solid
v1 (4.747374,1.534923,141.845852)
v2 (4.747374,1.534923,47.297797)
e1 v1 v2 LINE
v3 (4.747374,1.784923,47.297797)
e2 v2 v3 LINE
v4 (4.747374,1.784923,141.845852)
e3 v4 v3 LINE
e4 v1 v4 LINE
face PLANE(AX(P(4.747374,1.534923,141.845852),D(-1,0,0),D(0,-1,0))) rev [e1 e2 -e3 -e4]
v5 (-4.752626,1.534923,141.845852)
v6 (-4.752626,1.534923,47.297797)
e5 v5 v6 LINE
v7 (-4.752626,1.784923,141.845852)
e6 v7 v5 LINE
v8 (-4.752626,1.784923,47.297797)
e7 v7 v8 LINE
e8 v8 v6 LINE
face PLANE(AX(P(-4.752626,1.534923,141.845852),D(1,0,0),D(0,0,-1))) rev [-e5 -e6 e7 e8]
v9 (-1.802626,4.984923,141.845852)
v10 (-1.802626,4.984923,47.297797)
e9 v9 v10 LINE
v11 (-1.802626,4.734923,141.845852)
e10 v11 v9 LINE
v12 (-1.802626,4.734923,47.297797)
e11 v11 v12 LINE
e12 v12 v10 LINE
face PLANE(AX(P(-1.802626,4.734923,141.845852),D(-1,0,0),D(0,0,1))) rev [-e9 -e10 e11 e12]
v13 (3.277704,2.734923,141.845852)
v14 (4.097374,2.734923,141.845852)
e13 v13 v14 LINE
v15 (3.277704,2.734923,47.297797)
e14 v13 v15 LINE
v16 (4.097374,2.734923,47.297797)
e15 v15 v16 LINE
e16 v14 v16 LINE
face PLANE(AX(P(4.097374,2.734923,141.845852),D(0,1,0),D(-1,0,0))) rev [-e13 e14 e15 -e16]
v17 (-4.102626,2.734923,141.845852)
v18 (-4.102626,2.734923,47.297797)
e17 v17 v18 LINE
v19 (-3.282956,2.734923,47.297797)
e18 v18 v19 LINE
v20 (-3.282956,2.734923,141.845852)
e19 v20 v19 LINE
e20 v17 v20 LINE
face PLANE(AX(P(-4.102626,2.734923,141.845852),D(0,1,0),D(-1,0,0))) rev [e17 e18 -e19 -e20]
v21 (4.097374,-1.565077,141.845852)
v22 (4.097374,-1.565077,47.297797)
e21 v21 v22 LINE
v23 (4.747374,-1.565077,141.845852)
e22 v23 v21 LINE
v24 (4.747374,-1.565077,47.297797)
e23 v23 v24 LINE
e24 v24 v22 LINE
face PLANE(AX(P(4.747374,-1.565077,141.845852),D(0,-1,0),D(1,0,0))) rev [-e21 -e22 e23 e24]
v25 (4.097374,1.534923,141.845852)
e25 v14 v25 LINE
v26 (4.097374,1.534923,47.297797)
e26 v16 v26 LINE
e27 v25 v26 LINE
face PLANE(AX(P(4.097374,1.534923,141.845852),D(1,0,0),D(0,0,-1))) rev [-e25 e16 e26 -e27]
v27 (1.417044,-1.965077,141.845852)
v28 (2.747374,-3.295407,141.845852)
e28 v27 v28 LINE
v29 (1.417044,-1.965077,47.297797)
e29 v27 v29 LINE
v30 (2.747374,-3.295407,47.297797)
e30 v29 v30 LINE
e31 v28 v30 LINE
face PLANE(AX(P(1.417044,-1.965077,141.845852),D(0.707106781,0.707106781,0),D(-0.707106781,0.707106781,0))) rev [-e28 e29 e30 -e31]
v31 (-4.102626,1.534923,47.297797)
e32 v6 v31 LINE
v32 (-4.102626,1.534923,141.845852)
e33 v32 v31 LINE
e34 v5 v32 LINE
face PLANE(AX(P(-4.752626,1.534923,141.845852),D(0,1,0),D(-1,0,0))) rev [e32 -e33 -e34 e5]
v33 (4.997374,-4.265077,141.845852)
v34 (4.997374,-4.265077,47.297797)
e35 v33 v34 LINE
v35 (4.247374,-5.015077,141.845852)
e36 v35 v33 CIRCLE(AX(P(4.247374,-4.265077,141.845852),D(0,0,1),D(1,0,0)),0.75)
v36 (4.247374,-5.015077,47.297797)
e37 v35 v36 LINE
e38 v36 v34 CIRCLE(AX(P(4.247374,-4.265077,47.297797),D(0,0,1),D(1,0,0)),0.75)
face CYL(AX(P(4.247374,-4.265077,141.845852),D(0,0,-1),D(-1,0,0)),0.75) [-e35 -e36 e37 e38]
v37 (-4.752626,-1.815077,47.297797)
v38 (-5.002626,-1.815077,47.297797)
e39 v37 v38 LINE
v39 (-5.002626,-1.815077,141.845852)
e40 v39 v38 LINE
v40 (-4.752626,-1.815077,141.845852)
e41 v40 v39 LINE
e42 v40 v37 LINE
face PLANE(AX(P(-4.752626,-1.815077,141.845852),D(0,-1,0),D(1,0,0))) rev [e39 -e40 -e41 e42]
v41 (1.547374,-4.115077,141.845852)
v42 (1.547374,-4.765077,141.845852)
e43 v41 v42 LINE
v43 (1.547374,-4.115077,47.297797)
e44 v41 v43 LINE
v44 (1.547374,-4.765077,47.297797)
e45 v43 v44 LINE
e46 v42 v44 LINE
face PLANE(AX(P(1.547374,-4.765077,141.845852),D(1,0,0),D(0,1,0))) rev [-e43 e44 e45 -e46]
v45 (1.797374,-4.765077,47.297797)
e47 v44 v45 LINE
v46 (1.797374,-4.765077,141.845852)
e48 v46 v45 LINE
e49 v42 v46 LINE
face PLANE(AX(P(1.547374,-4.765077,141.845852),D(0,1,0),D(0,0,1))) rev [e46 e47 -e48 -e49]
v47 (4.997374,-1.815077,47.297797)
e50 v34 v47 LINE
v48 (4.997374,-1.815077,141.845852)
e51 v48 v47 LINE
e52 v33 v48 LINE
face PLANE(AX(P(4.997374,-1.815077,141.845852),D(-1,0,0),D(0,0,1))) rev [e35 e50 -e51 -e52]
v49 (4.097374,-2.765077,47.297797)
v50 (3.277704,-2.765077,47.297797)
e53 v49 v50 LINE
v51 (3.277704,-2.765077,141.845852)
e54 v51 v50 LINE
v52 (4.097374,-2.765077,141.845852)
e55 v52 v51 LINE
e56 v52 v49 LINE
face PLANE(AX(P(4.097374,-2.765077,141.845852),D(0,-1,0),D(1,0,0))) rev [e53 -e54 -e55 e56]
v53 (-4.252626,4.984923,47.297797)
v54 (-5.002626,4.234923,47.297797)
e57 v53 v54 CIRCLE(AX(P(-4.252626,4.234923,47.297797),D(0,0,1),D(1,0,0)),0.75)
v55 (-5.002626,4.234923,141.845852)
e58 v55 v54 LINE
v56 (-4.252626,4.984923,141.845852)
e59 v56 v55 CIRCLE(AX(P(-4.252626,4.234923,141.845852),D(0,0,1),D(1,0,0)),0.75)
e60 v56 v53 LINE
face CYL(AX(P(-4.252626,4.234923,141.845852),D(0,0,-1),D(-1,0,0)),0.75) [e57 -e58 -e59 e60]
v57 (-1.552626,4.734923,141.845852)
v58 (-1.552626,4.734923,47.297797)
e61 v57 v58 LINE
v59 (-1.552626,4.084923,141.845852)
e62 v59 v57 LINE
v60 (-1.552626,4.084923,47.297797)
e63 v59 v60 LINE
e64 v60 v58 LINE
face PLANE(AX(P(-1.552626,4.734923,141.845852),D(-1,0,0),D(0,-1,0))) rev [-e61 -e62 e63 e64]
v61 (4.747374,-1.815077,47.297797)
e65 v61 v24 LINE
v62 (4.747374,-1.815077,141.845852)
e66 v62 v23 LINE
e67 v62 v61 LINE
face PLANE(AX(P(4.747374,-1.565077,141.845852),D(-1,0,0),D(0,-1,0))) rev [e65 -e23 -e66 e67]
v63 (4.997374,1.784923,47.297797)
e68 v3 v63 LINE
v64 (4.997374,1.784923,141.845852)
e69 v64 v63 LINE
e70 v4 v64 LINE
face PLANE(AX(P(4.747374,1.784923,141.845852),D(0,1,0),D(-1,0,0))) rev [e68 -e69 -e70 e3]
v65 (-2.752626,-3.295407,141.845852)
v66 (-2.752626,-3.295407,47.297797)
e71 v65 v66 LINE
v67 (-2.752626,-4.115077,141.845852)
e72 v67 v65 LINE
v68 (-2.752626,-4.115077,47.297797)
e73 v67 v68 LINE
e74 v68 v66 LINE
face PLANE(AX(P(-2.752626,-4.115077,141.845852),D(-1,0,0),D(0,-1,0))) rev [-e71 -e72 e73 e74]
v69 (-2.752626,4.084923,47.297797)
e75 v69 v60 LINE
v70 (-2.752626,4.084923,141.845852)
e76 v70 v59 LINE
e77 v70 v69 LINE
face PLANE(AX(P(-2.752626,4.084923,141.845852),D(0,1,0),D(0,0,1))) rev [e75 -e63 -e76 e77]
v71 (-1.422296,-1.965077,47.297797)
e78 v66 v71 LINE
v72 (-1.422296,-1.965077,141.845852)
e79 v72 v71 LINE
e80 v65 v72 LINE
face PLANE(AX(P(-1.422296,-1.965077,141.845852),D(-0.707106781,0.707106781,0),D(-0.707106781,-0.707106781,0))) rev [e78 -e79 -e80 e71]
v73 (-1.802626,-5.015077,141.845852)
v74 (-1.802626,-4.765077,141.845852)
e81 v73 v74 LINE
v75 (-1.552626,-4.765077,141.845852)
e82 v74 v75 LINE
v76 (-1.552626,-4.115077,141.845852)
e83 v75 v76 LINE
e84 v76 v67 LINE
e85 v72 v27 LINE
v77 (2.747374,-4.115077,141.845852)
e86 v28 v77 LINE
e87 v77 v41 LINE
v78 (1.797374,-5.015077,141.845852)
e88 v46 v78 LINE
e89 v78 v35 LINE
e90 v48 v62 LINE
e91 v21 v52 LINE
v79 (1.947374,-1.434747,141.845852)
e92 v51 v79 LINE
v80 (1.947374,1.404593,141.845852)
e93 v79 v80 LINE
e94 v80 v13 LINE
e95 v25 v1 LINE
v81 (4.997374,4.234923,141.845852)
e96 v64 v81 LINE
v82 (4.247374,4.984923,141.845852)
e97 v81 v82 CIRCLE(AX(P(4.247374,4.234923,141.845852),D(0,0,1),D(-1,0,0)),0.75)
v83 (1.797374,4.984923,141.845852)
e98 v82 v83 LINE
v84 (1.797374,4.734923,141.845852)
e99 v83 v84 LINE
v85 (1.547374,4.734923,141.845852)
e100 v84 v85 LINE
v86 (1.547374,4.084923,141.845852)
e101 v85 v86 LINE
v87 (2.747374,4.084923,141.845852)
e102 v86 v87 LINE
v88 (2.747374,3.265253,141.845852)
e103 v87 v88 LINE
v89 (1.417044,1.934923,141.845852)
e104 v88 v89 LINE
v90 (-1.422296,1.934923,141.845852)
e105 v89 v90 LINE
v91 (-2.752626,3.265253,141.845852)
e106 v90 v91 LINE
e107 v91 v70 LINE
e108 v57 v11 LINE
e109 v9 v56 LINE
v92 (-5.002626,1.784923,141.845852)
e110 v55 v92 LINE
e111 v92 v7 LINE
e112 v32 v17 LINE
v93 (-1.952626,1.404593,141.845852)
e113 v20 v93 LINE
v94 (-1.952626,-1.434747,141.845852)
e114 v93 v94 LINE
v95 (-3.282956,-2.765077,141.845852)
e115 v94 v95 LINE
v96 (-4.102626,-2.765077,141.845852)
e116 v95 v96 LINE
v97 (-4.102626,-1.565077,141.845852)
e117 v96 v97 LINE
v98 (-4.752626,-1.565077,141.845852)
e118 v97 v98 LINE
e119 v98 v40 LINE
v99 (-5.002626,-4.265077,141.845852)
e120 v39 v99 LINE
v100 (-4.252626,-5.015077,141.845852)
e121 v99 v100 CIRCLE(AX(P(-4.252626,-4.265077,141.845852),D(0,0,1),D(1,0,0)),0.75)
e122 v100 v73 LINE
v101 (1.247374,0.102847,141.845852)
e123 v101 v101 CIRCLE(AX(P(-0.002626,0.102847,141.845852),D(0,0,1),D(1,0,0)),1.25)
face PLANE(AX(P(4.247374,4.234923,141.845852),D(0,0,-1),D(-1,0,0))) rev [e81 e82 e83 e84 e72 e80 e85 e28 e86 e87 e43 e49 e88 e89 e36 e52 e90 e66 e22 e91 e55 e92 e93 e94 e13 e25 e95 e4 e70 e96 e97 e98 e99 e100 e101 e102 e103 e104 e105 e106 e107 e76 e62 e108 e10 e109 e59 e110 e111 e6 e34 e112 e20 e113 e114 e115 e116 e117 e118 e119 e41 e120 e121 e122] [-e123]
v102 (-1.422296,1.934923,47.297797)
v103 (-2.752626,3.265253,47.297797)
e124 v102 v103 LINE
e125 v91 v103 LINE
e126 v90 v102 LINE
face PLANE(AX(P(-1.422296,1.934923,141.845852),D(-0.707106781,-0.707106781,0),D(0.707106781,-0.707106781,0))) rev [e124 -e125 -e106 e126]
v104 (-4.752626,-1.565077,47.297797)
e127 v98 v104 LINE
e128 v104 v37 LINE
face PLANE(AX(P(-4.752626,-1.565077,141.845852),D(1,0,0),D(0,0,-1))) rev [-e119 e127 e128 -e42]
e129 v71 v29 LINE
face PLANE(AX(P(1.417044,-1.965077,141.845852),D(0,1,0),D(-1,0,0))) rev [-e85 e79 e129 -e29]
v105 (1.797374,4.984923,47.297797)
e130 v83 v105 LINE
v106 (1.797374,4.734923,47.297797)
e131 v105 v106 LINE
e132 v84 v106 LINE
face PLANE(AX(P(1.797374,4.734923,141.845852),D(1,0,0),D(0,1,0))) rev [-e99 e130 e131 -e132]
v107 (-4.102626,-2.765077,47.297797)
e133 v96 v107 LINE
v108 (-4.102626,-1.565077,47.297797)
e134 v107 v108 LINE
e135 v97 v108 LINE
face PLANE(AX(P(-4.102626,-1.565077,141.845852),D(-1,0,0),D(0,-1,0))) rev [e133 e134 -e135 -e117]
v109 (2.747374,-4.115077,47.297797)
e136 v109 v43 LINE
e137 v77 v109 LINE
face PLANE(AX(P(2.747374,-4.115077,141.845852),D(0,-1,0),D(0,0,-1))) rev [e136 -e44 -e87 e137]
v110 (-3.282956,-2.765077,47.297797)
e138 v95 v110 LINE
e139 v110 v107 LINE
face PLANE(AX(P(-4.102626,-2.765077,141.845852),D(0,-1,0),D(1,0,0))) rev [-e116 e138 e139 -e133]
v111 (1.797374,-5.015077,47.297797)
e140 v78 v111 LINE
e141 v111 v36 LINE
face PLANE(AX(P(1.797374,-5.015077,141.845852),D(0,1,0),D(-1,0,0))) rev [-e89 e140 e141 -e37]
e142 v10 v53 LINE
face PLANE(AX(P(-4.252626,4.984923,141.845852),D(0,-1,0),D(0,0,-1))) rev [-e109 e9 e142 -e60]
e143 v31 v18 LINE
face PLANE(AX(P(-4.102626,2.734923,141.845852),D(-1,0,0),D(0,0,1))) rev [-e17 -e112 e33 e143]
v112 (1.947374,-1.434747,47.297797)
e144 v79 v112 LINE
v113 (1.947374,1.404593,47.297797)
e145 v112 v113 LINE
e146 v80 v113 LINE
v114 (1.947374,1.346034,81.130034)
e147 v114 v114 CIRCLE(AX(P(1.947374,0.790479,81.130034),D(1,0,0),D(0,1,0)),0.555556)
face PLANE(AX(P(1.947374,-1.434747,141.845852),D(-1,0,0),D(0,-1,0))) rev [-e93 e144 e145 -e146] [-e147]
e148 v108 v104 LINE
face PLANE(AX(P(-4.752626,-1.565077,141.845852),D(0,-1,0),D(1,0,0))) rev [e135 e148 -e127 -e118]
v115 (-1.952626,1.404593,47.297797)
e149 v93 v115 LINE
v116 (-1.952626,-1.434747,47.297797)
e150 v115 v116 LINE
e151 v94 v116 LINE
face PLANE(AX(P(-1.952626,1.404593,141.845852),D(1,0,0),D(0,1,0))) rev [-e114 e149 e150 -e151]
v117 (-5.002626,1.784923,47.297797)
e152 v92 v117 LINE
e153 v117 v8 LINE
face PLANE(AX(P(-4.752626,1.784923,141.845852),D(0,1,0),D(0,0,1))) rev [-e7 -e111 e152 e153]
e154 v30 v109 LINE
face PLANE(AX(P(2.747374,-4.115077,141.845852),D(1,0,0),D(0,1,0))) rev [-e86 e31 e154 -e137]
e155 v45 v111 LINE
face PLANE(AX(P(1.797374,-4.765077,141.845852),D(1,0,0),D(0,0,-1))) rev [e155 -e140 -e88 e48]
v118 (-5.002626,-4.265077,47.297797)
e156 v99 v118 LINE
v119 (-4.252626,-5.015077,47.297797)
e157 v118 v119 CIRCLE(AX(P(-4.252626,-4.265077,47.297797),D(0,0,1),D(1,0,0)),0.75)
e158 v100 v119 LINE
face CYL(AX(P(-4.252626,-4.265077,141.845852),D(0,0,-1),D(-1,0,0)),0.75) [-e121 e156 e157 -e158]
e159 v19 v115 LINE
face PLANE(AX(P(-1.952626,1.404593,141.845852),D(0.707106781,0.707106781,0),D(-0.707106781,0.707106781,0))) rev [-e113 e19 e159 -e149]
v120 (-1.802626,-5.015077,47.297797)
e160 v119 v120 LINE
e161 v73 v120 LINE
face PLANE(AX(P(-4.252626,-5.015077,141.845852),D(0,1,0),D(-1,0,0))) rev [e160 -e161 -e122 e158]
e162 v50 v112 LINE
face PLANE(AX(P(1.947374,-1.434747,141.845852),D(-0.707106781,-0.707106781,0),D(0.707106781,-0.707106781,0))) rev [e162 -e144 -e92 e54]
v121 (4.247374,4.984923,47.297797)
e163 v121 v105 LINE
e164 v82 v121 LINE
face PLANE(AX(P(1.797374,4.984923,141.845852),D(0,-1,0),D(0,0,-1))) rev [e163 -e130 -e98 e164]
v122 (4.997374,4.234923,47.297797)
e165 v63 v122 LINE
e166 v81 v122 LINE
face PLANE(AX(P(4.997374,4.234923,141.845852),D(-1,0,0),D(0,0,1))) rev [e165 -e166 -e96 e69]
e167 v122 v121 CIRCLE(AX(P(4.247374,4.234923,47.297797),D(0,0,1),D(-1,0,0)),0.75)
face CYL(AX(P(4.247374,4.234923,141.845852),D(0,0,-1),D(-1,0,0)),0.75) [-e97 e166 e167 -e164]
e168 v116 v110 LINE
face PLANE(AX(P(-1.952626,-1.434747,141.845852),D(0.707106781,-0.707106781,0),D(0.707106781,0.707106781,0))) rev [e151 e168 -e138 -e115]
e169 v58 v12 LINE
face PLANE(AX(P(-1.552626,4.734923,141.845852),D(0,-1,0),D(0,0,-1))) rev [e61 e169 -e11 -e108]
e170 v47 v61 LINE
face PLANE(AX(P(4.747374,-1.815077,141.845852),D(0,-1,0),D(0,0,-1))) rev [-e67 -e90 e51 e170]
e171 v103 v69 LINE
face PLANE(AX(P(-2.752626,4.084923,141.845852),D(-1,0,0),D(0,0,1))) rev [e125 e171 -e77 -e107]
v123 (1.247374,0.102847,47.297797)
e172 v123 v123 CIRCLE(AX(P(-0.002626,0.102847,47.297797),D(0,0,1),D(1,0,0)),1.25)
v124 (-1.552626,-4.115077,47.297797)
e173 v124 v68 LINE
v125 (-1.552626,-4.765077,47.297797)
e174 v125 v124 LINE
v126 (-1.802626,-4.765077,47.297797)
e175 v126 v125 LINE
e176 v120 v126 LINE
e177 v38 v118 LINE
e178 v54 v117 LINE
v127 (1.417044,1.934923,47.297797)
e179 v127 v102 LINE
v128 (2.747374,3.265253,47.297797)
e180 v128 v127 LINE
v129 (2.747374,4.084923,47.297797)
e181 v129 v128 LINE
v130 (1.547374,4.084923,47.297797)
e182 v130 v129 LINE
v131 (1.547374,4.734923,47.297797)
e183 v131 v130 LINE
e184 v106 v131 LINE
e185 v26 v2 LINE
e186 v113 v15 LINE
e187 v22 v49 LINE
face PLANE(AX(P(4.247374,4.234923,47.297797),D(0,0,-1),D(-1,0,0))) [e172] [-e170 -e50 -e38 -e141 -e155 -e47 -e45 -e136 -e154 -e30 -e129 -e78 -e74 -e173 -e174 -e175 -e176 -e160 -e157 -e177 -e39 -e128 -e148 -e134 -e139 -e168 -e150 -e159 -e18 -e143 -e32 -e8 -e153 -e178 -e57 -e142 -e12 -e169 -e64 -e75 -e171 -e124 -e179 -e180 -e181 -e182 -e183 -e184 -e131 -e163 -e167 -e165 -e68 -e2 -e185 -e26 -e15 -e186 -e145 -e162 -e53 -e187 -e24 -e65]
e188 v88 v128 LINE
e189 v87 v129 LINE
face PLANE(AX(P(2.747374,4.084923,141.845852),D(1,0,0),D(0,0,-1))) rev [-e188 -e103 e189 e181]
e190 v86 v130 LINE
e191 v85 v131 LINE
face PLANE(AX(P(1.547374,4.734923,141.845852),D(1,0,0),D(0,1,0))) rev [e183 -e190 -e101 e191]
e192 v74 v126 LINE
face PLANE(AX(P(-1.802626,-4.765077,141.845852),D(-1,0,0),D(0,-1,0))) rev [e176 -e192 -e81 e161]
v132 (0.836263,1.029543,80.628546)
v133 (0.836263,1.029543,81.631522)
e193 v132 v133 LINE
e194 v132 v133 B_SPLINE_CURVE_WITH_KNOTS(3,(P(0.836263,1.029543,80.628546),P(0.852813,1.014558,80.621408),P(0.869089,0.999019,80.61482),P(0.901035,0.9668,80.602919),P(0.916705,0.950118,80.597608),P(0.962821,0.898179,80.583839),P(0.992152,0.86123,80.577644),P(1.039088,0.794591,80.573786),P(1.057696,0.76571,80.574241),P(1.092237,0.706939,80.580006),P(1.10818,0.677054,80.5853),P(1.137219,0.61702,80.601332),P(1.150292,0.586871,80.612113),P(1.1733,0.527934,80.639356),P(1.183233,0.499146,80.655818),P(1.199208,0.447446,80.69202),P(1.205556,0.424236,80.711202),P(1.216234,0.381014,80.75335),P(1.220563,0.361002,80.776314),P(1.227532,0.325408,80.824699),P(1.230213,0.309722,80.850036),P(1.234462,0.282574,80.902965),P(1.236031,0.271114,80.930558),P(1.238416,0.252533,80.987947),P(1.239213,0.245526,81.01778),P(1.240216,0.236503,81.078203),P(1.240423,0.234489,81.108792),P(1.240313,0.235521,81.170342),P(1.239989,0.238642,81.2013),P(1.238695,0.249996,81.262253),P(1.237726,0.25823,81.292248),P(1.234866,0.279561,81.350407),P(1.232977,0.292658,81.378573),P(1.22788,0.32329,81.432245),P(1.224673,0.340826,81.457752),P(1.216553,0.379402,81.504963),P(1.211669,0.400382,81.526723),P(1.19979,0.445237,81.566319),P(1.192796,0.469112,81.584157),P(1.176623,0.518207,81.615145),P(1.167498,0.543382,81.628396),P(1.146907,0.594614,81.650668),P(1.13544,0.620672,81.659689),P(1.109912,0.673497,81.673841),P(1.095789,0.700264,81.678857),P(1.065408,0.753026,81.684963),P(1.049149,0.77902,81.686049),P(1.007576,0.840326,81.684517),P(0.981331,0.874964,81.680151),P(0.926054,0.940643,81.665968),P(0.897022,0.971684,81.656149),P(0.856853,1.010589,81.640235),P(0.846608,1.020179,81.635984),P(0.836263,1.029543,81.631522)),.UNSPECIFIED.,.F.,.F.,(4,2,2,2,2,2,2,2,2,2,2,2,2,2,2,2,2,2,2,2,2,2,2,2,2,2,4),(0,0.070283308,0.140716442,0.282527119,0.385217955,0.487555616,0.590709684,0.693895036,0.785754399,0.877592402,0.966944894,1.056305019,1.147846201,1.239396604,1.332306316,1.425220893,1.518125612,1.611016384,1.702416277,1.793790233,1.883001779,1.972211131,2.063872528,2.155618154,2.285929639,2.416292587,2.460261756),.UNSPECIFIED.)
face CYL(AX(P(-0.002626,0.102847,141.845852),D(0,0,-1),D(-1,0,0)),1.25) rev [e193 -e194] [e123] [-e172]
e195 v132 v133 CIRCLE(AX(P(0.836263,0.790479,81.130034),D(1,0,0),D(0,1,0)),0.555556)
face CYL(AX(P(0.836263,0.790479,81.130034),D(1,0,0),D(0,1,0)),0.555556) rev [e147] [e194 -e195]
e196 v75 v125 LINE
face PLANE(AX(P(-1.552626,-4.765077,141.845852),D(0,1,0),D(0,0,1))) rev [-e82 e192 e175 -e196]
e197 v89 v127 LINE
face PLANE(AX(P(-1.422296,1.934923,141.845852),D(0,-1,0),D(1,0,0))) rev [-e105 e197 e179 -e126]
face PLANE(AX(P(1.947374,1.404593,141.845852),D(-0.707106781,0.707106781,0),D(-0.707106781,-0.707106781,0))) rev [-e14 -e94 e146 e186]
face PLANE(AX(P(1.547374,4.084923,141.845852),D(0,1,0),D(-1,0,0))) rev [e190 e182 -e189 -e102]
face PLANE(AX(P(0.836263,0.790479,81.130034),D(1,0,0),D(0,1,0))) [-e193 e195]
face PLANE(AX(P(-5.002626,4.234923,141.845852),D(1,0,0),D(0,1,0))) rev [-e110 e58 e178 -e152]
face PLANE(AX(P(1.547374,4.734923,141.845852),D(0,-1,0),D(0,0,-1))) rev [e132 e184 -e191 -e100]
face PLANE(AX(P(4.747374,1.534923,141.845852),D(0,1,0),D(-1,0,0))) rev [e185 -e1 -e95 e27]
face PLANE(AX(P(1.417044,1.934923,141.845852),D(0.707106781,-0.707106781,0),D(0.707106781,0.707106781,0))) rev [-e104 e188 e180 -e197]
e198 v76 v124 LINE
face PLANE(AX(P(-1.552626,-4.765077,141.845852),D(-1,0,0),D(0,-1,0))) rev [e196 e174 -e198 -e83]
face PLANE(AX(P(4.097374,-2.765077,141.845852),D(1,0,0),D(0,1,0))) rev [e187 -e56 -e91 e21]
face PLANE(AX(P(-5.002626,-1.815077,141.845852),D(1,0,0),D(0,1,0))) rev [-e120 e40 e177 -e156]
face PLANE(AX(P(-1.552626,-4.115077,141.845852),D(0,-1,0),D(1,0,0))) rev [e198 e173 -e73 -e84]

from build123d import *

# Parameters (mm, degrees)
SKETCH1_R           = 2.5
BOSS_EXTRUDE1_DEPTH = 189.096108091
SCALE_2_SCALE       = 3
SCALE_3_SCALE       = 6
SCALE_5_SCALE       = 2
SCALE_6_SCALE       = 0.25
SCALE_7_SCALE       = 0.125
SCALE_8_SCALE       = 0.25
SCALE_9_SCALE       = 4
SCALE_10_SCALE      = 4
OTHER_START         = 7.55
OTHER_1_OUTLINE_R   = 5
OTHER_1_DEPTH       = 10
SCALE_11_SCALE      = 0.111111111


# Read off the part's stored shape, not the designer's step: 孔1
with BuildPart() as part:
    # Sketch1 → Boss-Extrude1 (new body)
    with BuildSketch(Plane.XY):
        with BuildLine():
            Line((2.839339828, 3.9), (5.5, 6.560660172))
            Line((5.5, 6.560660172), (5.5, 8.2))
            Line((5.5, 8.2), (3.1, 8.2))
            Line((3.1, 8.2), (3.1, 9.5))
            Line((3.1, 9.5), (3.6, 9.5))
            Line((3.6, 9.5), (3.6, 10))
            Line((3.6, 10), (8.5, 10))
            ThreePointArc((8.5, 10), (9.560660172, 9.560660172), (10, 8.5))
            Line((10, 8.5), (10, 3.6))
            Line((10, 3.6), (9.5, 3.6))
            Line((9.5, 3.6), (9.5, 3.1))
            Line((9.5, 3.1), (8.2, 3.1))
            Line((8.2, 3.1), (8.2, 5.5))
            Line((8.2, 5.5), (6.560660172, 5.5))
            Line((6.560660172, 5.5), (3.9, 2.839339828))
            Line((3.9, 2.839339828), (3.9, -2.839339828))
            Line((3.9, -2.839339828), (6.560660172, -5.5))
            Line((6.560660172, -5.5), (8.2, -5.5))
            Line((8.2, -5.5), (8.2, -3.1))
            Line((8.2, -3.1), (9.5, -3.1))
            Line((9.5, -3.1), (9.5, -3.6))
            Line((9.5, -3.6), (10, -3.6))
            Line((10, -3.6), (10, -8.5))
            ThreePointArc((10, -8.5), (9.560660172, -9.560660172), (8.5, -10))
            Line((8.5, -10), (3.6, -10))
            Line((3.6, -10), (3.6, -9.5))
            Line((3.6, -9.5), (3.1, -9.5))
            Line((3.1, -9.5), (3.1, -8.2))
            Line((3.1, -8.2), (5.5, -8.2))
            Line((5.5, -8.2), (5.5, -6.560660172))
            Line((5.5, -6.560660172), (2.839339828, -3.9))
            Line((2.839339828, -3.9), (-2.839339828, -3.9))
            Line((-2.839339828, -3.9), (-5.5, -6.560660172))
            Line((-5.5, -6.560660172), (-5.5, -8.2))
            Line((-5.5, -8.2), (-3.1, -8.2))
            Line((-3.1, -8.2), (-3.1, -9.5))
            Line((-3.1, -9.5), (-3.6, -9.5))
            Line((-3.6, -9.5), (-3.6, -10))
            Line((-3.6, -10), (-8.5, -10))
            ThreePointArc((-8.5, -10), (-9.560660172, -9.560660172), (-10, -8.5))
            Line((-10, -8.5), (-10, -3.6))
            Line((-10, -3.6), (-9.5, -3.6))
            Line((-9.5, -3.6), (-9.5, -3.1))
            Line((-9.5, -3.1), (-8.2, -3.1))
            Line((-8.2, -3.1), (-8.2, -5.5))
            Line((-8.2, -5.5), (-6.560660172, -5.5))
            Line((-6.560660172, -5.5), (-3.9, -2.839339828))
            Line((-3.9, -2.839339828), (-3.9, 2.839339828))
            Line((-3.9, 2.839339828), (-6.560660172, 5.5))
            Line((-6.560660172, 5.5), (-8.2, 5.5))
            Line((-8.2, 5.5), (-8.2, 3.1))
            Line((-8.2, 3.1), (-9.5, 3.1))
            Line((-9.5, 3.1), (-9.5, 3.6))
            Line((-9.5, 3.6), (-10, 3.6))
            Line((-10, 3.6), (-10, 8.5))
            ThreePointArc((-10, 8.5), (-9.560660172, 9.560660172), (-8.5, 10))
            Line((-8.5, 10), (-3.6, 10))
            Line((-3.6, 10), (-3.6, 9.5))
            Line((-3.6, 9.5), (-3.1, 9.5))
            Line((-3.1, 9.5), (-3.1, 8.2))
            Line((-3.1, 8.2), (-5.5, 8.2))
            Line((-5.5, 8.2), (-5.5, 6.560660172))
            Line((-5.5, 6.560660172), (-2.839339828, 3.9))
            Line((-2.839339828, 3.9), (2.839339828, 3.9))
        make_face()
        with Locations((0, 0.235847297)):
            Circle(SKETCH1_R, mode=Mode.SUBTRACT)
    extrude(amount=BOSS_EXTRUDE1_DEPTH)


with BuildPart() as part_1:
    # 缩放比例2: scaled about (0, -0.027095247, 94.548054046)
    add(part.part.scale(SCALE_2_SCALE).moved(Location((0, 0.054190494, -189.096108092))))


with BuildPart() as part_2:
    # 缩放比例3: scaled about (0, -0.027095247, 94.548054045)
    add(part_1.part.scale(SCALE_3_SCALE).moved(Location((0, 0.135476235, -472.740270225))))


with BuildPart() as part_3:
    # 缩放比例5: scaled about (0, -0.027095249, 94.548054043)
    add(part_2.part.scale(SCALE_5_SCALE).moved(Location((0, 0.027095249, -94.548054043))))


with BuildPart() as part_4:
    # 缩放比例6: scaled about (0, -0.027095249, 94.548054044)
    add(part_3.part.scale(SCALE_6_SCALE).moved(Location((0, -0.020321437, 70.911040533))))


with BuildPart() as part_5:
    # 缩放比例7: scaled about (0, -0.027095249, 94.548054044)
    add(part_4.part.scale(SCALE_7_SCALE).moved(Location((0, -0.023708343, 82.729547289))))


with BuildPart() as part_6:
    # 缩放比例8: scaled about (0, -0.027095249, 94.548054044)
    add(part_5.part.scale(SCALE_8_SCALE).moved(Location((0, -0.020321437, 70.911040533))))


with BuildPart() as part_7:
    # 缩放比例9: scaled about (0, -0.027095249, 94.548054044)
    add(part_6.part.scale(SCALE_9_SCALE).moved(Location((0, 0.081285747, -283.644162132))))


with BuildPart() as part_8:
    # 缩放比例10: scaled about (0, -0.027095249, 94.548054044)
    add(part_7.part.scale(SCALE_10_SCALE).moved(Location((0, 0.081285747, -283.644162132))))

    # 孔1 outline → 孔1 (cut)
    with BuildSketch(Plane.YZ.offset(OTHER_START)):
        with Locations((7.344832291, -26.42806198)):
            Circle(OTHER_1_OUTLINE_R)
    extrude(amount=OTHER_1_DEPTH, mode=Mode.SUBTRACT)


with BuildPart() as part_9:
    # 缩放比例11: scaled about (-0.002946752, -0.028813034, 94.574865823)
    add(part_8.part.scale(SCALE_11_SCALE).moved(Location((-0.002619335, -0.025611586, 84.066547398))))


solid = part_9.part
